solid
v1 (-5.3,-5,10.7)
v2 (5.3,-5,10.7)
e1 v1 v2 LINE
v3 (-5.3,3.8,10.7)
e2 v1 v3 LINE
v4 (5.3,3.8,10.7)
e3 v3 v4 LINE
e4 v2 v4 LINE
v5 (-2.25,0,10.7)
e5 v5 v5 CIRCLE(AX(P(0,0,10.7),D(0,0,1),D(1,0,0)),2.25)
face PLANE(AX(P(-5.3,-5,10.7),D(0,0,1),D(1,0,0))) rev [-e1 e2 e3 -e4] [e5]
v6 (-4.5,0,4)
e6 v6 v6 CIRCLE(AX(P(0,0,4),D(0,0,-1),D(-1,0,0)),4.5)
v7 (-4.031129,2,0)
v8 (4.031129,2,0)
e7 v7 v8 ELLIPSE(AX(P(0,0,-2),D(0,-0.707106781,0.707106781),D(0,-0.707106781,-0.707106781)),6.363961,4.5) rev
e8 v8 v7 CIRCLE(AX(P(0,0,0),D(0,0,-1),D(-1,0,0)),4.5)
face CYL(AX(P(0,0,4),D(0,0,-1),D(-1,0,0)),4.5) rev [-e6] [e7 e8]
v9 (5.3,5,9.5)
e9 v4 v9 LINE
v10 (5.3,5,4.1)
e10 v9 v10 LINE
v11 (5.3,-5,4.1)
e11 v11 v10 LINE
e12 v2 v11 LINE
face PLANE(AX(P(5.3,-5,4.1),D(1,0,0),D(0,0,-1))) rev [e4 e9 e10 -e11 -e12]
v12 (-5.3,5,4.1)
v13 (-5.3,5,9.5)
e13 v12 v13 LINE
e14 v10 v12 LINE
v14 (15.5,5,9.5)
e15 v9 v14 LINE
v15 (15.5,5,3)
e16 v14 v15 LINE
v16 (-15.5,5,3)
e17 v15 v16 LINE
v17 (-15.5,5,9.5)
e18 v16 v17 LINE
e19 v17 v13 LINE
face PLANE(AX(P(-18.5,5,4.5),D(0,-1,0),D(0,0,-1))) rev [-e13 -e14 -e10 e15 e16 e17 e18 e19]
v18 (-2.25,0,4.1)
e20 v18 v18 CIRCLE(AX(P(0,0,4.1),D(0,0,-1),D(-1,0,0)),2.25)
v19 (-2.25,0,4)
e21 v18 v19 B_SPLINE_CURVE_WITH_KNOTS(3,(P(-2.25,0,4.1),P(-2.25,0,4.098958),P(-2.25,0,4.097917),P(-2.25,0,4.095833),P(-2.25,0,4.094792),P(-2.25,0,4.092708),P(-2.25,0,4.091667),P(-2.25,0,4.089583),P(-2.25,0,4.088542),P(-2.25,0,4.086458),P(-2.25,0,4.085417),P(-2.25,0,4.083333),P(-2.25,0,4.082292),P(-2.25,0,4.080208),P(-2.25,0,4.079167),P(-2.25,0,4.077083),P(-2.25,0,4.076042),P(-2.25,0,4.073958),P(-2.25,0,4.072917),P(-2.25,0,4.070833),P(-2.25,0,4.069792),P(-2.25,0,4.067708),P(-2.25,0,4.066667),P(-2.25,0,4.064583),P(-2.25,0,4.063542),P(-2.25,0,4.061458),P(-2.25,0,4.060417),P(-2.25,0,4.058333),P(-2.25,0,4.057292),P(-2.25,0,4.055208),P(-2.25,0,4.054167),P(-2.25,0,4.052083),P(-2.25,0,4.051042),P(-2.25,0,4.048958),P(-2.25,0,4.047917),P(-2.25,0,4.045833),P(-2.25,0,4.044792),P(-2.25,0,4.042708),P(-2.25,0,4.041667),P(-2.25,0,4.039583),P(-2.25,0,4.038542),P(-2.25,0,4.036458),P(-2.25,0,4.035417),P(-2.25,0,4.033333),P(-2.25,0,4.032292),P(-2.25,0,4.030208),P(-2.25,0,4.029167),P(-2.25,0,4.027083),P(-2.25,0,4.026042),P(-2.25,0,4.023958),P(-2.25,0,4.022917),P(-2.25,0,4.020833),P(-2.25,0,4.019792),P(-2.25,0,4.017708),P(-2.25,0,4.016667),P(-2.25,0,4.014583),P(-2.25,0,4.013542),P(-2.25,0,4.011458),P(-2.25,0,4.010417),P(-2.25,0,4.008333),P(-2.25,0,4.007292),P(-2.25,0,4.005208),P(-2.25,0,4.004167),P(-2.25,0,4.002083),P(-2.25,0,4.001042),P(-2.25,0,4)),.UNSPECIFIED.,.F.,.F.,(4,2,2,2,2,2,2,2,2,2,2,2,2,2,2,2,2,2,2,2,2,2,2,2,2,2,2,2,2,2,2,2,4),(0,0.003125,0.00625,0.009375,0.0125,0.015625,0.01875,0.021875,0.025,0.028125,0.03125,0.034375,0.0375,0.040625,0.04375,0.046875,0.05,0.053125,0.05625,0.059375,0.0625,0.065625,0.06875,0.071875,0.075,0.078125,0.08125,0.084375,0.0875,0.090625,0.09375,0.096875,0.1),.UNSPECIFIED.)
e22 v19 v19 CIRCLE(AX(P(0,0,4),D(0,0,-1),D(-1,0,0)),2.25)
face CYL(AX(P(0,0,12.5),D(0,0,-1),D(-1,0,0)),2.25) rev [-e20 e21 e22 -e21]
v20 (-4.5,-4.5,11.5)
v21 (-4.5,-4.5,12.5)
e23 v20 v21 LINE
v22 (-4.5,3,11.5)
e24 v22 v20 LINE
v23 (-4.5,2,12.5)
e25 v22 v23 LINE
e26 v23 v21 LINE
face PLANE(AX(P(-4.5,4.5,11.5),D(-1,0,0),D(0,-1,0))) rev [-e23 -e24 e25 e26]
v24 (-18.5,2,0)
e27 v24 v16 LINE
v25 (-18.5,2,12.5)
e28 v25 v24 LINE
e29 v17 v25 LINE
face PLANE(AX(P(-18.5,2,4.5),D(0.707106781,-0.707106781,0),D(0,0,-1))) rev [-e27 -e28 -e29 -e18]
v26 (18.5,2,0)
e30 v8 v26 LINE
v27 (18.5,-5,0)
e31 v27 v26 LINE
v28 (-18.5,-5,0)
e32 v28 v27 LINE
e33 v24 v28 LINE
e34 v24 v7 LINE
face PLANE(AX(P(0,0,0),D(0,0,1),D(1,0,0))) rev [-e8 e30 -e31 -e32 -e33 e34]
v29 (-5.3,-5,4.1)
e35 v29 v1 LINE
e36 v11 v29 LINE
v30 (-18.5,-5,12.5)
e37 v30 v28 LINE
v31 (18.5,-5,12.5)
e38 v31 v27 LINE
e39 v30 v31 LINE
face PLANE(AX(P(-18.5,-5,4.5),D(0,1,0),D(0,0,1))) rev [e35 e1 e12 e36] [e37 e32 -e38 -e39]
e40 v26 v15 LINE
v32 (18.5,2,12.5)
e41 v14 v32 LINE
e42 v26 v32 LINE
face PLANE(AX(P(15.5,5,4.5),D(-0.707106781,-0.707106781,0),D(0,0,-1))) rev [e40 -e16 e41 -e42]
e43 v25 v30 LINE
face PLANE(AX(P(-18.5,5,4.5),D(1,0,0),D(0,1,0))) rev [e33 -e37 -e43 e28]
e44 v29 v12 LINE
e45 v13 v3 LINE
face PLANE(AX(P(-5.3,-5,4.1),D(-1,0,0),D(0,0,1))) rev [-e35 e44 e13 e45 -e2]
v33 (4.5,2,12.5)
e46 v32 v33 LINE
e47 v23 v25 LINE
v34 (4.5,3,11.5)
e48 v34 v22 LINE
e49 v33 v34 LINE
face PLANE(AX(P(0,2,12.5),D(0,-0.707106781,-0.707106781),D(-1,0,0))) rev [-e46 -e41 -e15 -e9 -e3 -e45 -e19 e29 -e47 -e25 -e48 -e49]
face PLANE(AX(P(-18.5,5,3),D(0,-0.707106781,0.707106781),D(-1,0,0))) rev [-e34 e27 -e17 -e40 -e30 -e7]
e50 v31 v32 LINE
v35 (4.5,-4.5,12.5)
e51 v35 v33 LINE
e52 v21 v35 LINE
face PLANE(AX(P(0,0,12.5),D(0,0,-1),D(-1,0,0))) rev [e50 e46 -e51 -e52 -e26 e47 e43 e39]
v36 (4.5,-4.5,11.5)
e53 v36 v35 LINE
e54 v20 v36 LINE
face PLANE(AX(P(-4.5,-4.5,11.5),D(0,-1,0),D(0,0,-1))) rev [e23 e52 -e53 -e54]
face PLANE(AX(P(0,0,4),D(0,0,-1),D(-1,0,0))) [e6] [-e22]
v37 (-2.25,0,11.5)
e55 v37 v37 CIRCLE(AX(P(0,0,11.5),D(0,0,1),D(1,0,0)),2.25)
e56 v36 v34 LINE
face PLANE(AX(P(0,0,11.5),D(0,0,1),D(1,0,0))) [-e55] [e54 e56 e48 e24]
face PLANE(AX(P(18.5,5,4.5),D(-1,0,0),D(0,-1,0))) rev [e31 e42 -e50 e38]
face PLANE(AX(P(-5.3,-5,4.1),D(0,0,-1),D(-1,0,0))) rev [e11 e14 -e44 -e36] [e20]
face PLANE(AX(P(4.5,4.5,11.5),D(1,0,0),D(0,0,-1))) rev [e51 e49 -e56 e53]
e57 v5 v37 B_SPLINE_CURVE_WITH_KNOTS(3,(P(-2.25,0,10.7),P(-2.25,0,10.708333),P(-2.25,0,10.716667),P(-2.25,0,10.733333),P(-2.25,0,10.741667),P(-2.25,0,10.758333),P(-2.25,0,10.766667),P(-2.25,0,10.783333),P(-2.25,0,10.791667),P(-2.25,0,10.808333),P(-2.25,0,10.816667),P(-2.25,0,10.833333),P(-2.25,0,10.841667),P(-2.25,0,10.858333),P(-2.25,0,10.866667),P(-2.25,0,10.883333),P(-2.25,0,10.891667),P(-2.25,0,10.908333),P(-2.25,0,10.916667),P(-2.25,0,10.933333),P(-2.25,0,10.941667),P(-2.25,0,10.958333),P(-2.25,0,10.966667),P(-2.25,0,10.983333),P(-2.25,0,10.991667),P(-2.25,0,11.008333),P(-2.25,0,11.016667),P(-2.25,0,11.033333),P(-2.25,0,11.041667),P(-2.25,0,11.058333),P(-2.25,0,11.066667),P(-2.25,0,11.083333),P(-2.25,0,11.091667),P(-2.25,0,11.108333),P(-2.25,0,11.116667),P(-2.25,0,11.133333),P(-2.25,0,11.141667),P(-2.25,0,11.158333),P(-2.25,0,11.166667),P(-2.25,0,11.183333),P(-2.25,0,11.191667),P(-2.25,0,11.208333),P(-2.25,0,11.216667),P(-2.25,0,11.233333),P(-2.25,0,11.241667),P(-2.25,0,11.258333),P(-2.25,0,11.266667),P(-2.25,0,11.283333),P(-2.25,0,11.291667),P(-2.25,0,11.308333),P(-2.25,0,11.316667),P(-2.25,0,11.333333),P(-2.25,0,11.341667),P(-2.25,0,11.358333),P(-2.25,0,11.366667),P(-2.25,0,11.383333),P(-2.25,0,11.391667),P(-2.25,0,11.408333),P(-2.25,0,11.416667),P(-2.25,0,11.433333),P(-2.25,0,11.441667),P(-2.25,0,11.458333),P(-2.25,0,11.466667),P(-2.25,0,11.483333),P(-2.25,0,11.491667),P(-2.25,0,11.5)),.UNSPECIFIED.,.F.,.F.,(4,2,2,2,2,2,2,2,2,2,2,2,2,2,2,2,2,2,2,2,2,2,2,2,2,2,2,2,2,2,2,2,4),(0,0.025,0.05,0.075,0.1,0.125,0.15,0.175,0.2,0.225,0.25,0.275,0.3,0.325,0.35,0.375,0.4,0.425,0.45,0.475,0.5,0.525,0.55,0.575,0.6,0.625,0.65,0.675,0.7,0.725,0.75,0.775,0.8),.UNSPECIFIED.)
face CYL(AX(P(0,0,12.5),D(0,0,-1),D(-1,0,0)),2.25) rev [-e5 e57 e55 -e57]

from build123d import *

# Parameters (mm, degrees)
SKETCH_1_W          = 37
SKETCH_1_H          = 10
EXTRUDE_1_DEPTH     = 4.5
SKETCH_4_W          = 13.4
SKETCH_4_H          = 10
EXTRUDE_2_DEPTH     = 6
SKETCH_5_W          = 10.2
SKETCH_5_H          = 10
CUT_EXTRUDE_4_DEPTH = 0.2
SKETCH_6_W          = 37
SKETCH_6_H          = 10
EXTRUDE_3_DEPTH     = 2
SKETCH_2_R          = 2.25
CUT_EXTRUDE_1_DEPTH = 23.880122377
SKETCH_3_R          = 4.5
CUT_EXTRUDE_3_DEPTH = 4
SKETCH_7_W          = 9
SKETCH_7_H          = 9
CUT_EXTRUDE_5_DEPTH = 1
CHAMFER_1_SIZE      = 3
SKETCH_8_W          = 10.6
SKETCH_8_H          = 6.6
CUT_EXTRUDE_6_DEPTH = 25.464259645


with BuildPart() as part:
    # 스케치1 → 보스-돌출1 (new body)
    with BuildSketch(Plane.XY):
        Rectangle(SKETCH_1_W, SKETCH_1_H)
    extrude(amount=EXTRUDE_1_DEPTH)

    # 스케치4 → 보스-돌출2 (add)
    with BuildSketch(Plane.XY.offset(4.5)):
        with Locations((-11.8, 0)):
            Rectangle(SKETCH_4_W, SKETCH_4_H)
        with Locations((11.8, 0)):
            Rectangle(SKETCH_4_W, SKETCH_4_H)
    extrude(amount=EXTRUDE_2_DEPTH)

    # 스케치5 → 컷-돌출4 (cut)
    with BuildSketch(Plane.XY.offset(4.5)):
        Rectangle(SKETCH_5_W, SKETCH_5_H)
    extrude(amount=-CUT_EXTRUDE_4_DEPTH, mode=Mode.SUBTRACT)

    # 스케치6 → 보스-돌출3 (add)
    with BuildSketch(Plane.XY.offset(10.5)):
        Rectangle(SKETCH_6_W, SKETCH_6_H)
    extrude(amount=EXTRUDE_3_DEPTH)

    # 스케치2 → 컷-돌출1 (cut, through all)
    with BuildSketch(Plane.XY):
        with Locations(Location((0, 0, 0), (0, 0, 180))):
            Circle(SKETCH_2_R)
    extrude(amount=CUT_EXTRUDE_1_DEPTH, mode=Mode.SUBTRACT)

    # 스케치3 → 컷-돌출3 (cut)
    with BuildSketch(Plane(origin=(0, 0, 0), x_dir=(-1, 0, 0), z_dir=(0, 0, -1))):
        Circle(SKETCH_3_R)
    extrude(amount=-CUT_EXTRUDE_3_DEPTH, mode=Mode.SUBTRACT)

    # 스케치7 → 컷-돌출5 (cut)
    with BuildSketch(Plane.XY.offset(12.5)):
        Rectangle(SKETCH_7_W, SKETCH_7_H)
    extrude(amount=-CUT_EXTRUDE_5_DEPTH, mode=Mode.SUBTRACT)

    # 모따기1
    # the kernel refuses this chamfer: 3 mm, written as the material it takes off along each edge
    with BuildSketch(Plane(origin=(-26.215048964, 5, 0), x_dir=(0, 0.02749587661058649, 0.9996219169112968), z_dir=(1, 0, 0)), Plane(origin=(26.215048964, 5, 12.5), x_dir=(0, 0.027495876610586494, -0.9996219169112968), z_dir=(-1, 0, 0))) as chamfer_1_piece_1:
        Polygon((CHAMFER_1_SIZE * 0.999621916911, CHAMFER_1_SIZE * 0.0274958766106), (-CHAMFER_1_SIZE * 0.0274958766106, CHAMFER_1_SIZE * 0.999621916911), (0, 0), align=None)
    extrude(amount=52.430097928, mode=Mode.SUBTRACT)
    with BuildSketch(Plane(origin=(18.5, 5, 20.215048964), x_dir=(-0.9996219169112969, 0.027495876610586497, 0), z_dir=(0, 0, -1)), Plane(origin=(-18.5, 5, -7.715048964), x_dir=(0.9996219169112969, 0.027495876610586497, 0), z_dir=(0, 0, 1))) as chamfer_1_piece_2:
        Polygon((CHAMFER_1_SIZE * 0.999621916911, -CHAMFER_1_SIZE * 0.0274958766106), (-CHAMFER_1_SIZE * 0.0274958766106, -CHAMFER_1_SIZE * 0.999621916911), (0, 0), align=None)
    extrude(amount=27.930097928, mode=Mode.SUBTRACT)

    # 스케치8 → 컷-돌출6 (cut, through all)
    with BuildSketch(Plane(origin=(0, 5, 0), x_dir=(1, 0, 0), z_dir=(0, 1, 0))):
        with Locations((0, -7.4)):
            Rectangle(SKETCH_8_W, SKETCH_8_H)
    extrude(amount=-CUT_EXTRUDE_6_DEPTH, mode=Mode.SUBTRACT)


solid = part.part
